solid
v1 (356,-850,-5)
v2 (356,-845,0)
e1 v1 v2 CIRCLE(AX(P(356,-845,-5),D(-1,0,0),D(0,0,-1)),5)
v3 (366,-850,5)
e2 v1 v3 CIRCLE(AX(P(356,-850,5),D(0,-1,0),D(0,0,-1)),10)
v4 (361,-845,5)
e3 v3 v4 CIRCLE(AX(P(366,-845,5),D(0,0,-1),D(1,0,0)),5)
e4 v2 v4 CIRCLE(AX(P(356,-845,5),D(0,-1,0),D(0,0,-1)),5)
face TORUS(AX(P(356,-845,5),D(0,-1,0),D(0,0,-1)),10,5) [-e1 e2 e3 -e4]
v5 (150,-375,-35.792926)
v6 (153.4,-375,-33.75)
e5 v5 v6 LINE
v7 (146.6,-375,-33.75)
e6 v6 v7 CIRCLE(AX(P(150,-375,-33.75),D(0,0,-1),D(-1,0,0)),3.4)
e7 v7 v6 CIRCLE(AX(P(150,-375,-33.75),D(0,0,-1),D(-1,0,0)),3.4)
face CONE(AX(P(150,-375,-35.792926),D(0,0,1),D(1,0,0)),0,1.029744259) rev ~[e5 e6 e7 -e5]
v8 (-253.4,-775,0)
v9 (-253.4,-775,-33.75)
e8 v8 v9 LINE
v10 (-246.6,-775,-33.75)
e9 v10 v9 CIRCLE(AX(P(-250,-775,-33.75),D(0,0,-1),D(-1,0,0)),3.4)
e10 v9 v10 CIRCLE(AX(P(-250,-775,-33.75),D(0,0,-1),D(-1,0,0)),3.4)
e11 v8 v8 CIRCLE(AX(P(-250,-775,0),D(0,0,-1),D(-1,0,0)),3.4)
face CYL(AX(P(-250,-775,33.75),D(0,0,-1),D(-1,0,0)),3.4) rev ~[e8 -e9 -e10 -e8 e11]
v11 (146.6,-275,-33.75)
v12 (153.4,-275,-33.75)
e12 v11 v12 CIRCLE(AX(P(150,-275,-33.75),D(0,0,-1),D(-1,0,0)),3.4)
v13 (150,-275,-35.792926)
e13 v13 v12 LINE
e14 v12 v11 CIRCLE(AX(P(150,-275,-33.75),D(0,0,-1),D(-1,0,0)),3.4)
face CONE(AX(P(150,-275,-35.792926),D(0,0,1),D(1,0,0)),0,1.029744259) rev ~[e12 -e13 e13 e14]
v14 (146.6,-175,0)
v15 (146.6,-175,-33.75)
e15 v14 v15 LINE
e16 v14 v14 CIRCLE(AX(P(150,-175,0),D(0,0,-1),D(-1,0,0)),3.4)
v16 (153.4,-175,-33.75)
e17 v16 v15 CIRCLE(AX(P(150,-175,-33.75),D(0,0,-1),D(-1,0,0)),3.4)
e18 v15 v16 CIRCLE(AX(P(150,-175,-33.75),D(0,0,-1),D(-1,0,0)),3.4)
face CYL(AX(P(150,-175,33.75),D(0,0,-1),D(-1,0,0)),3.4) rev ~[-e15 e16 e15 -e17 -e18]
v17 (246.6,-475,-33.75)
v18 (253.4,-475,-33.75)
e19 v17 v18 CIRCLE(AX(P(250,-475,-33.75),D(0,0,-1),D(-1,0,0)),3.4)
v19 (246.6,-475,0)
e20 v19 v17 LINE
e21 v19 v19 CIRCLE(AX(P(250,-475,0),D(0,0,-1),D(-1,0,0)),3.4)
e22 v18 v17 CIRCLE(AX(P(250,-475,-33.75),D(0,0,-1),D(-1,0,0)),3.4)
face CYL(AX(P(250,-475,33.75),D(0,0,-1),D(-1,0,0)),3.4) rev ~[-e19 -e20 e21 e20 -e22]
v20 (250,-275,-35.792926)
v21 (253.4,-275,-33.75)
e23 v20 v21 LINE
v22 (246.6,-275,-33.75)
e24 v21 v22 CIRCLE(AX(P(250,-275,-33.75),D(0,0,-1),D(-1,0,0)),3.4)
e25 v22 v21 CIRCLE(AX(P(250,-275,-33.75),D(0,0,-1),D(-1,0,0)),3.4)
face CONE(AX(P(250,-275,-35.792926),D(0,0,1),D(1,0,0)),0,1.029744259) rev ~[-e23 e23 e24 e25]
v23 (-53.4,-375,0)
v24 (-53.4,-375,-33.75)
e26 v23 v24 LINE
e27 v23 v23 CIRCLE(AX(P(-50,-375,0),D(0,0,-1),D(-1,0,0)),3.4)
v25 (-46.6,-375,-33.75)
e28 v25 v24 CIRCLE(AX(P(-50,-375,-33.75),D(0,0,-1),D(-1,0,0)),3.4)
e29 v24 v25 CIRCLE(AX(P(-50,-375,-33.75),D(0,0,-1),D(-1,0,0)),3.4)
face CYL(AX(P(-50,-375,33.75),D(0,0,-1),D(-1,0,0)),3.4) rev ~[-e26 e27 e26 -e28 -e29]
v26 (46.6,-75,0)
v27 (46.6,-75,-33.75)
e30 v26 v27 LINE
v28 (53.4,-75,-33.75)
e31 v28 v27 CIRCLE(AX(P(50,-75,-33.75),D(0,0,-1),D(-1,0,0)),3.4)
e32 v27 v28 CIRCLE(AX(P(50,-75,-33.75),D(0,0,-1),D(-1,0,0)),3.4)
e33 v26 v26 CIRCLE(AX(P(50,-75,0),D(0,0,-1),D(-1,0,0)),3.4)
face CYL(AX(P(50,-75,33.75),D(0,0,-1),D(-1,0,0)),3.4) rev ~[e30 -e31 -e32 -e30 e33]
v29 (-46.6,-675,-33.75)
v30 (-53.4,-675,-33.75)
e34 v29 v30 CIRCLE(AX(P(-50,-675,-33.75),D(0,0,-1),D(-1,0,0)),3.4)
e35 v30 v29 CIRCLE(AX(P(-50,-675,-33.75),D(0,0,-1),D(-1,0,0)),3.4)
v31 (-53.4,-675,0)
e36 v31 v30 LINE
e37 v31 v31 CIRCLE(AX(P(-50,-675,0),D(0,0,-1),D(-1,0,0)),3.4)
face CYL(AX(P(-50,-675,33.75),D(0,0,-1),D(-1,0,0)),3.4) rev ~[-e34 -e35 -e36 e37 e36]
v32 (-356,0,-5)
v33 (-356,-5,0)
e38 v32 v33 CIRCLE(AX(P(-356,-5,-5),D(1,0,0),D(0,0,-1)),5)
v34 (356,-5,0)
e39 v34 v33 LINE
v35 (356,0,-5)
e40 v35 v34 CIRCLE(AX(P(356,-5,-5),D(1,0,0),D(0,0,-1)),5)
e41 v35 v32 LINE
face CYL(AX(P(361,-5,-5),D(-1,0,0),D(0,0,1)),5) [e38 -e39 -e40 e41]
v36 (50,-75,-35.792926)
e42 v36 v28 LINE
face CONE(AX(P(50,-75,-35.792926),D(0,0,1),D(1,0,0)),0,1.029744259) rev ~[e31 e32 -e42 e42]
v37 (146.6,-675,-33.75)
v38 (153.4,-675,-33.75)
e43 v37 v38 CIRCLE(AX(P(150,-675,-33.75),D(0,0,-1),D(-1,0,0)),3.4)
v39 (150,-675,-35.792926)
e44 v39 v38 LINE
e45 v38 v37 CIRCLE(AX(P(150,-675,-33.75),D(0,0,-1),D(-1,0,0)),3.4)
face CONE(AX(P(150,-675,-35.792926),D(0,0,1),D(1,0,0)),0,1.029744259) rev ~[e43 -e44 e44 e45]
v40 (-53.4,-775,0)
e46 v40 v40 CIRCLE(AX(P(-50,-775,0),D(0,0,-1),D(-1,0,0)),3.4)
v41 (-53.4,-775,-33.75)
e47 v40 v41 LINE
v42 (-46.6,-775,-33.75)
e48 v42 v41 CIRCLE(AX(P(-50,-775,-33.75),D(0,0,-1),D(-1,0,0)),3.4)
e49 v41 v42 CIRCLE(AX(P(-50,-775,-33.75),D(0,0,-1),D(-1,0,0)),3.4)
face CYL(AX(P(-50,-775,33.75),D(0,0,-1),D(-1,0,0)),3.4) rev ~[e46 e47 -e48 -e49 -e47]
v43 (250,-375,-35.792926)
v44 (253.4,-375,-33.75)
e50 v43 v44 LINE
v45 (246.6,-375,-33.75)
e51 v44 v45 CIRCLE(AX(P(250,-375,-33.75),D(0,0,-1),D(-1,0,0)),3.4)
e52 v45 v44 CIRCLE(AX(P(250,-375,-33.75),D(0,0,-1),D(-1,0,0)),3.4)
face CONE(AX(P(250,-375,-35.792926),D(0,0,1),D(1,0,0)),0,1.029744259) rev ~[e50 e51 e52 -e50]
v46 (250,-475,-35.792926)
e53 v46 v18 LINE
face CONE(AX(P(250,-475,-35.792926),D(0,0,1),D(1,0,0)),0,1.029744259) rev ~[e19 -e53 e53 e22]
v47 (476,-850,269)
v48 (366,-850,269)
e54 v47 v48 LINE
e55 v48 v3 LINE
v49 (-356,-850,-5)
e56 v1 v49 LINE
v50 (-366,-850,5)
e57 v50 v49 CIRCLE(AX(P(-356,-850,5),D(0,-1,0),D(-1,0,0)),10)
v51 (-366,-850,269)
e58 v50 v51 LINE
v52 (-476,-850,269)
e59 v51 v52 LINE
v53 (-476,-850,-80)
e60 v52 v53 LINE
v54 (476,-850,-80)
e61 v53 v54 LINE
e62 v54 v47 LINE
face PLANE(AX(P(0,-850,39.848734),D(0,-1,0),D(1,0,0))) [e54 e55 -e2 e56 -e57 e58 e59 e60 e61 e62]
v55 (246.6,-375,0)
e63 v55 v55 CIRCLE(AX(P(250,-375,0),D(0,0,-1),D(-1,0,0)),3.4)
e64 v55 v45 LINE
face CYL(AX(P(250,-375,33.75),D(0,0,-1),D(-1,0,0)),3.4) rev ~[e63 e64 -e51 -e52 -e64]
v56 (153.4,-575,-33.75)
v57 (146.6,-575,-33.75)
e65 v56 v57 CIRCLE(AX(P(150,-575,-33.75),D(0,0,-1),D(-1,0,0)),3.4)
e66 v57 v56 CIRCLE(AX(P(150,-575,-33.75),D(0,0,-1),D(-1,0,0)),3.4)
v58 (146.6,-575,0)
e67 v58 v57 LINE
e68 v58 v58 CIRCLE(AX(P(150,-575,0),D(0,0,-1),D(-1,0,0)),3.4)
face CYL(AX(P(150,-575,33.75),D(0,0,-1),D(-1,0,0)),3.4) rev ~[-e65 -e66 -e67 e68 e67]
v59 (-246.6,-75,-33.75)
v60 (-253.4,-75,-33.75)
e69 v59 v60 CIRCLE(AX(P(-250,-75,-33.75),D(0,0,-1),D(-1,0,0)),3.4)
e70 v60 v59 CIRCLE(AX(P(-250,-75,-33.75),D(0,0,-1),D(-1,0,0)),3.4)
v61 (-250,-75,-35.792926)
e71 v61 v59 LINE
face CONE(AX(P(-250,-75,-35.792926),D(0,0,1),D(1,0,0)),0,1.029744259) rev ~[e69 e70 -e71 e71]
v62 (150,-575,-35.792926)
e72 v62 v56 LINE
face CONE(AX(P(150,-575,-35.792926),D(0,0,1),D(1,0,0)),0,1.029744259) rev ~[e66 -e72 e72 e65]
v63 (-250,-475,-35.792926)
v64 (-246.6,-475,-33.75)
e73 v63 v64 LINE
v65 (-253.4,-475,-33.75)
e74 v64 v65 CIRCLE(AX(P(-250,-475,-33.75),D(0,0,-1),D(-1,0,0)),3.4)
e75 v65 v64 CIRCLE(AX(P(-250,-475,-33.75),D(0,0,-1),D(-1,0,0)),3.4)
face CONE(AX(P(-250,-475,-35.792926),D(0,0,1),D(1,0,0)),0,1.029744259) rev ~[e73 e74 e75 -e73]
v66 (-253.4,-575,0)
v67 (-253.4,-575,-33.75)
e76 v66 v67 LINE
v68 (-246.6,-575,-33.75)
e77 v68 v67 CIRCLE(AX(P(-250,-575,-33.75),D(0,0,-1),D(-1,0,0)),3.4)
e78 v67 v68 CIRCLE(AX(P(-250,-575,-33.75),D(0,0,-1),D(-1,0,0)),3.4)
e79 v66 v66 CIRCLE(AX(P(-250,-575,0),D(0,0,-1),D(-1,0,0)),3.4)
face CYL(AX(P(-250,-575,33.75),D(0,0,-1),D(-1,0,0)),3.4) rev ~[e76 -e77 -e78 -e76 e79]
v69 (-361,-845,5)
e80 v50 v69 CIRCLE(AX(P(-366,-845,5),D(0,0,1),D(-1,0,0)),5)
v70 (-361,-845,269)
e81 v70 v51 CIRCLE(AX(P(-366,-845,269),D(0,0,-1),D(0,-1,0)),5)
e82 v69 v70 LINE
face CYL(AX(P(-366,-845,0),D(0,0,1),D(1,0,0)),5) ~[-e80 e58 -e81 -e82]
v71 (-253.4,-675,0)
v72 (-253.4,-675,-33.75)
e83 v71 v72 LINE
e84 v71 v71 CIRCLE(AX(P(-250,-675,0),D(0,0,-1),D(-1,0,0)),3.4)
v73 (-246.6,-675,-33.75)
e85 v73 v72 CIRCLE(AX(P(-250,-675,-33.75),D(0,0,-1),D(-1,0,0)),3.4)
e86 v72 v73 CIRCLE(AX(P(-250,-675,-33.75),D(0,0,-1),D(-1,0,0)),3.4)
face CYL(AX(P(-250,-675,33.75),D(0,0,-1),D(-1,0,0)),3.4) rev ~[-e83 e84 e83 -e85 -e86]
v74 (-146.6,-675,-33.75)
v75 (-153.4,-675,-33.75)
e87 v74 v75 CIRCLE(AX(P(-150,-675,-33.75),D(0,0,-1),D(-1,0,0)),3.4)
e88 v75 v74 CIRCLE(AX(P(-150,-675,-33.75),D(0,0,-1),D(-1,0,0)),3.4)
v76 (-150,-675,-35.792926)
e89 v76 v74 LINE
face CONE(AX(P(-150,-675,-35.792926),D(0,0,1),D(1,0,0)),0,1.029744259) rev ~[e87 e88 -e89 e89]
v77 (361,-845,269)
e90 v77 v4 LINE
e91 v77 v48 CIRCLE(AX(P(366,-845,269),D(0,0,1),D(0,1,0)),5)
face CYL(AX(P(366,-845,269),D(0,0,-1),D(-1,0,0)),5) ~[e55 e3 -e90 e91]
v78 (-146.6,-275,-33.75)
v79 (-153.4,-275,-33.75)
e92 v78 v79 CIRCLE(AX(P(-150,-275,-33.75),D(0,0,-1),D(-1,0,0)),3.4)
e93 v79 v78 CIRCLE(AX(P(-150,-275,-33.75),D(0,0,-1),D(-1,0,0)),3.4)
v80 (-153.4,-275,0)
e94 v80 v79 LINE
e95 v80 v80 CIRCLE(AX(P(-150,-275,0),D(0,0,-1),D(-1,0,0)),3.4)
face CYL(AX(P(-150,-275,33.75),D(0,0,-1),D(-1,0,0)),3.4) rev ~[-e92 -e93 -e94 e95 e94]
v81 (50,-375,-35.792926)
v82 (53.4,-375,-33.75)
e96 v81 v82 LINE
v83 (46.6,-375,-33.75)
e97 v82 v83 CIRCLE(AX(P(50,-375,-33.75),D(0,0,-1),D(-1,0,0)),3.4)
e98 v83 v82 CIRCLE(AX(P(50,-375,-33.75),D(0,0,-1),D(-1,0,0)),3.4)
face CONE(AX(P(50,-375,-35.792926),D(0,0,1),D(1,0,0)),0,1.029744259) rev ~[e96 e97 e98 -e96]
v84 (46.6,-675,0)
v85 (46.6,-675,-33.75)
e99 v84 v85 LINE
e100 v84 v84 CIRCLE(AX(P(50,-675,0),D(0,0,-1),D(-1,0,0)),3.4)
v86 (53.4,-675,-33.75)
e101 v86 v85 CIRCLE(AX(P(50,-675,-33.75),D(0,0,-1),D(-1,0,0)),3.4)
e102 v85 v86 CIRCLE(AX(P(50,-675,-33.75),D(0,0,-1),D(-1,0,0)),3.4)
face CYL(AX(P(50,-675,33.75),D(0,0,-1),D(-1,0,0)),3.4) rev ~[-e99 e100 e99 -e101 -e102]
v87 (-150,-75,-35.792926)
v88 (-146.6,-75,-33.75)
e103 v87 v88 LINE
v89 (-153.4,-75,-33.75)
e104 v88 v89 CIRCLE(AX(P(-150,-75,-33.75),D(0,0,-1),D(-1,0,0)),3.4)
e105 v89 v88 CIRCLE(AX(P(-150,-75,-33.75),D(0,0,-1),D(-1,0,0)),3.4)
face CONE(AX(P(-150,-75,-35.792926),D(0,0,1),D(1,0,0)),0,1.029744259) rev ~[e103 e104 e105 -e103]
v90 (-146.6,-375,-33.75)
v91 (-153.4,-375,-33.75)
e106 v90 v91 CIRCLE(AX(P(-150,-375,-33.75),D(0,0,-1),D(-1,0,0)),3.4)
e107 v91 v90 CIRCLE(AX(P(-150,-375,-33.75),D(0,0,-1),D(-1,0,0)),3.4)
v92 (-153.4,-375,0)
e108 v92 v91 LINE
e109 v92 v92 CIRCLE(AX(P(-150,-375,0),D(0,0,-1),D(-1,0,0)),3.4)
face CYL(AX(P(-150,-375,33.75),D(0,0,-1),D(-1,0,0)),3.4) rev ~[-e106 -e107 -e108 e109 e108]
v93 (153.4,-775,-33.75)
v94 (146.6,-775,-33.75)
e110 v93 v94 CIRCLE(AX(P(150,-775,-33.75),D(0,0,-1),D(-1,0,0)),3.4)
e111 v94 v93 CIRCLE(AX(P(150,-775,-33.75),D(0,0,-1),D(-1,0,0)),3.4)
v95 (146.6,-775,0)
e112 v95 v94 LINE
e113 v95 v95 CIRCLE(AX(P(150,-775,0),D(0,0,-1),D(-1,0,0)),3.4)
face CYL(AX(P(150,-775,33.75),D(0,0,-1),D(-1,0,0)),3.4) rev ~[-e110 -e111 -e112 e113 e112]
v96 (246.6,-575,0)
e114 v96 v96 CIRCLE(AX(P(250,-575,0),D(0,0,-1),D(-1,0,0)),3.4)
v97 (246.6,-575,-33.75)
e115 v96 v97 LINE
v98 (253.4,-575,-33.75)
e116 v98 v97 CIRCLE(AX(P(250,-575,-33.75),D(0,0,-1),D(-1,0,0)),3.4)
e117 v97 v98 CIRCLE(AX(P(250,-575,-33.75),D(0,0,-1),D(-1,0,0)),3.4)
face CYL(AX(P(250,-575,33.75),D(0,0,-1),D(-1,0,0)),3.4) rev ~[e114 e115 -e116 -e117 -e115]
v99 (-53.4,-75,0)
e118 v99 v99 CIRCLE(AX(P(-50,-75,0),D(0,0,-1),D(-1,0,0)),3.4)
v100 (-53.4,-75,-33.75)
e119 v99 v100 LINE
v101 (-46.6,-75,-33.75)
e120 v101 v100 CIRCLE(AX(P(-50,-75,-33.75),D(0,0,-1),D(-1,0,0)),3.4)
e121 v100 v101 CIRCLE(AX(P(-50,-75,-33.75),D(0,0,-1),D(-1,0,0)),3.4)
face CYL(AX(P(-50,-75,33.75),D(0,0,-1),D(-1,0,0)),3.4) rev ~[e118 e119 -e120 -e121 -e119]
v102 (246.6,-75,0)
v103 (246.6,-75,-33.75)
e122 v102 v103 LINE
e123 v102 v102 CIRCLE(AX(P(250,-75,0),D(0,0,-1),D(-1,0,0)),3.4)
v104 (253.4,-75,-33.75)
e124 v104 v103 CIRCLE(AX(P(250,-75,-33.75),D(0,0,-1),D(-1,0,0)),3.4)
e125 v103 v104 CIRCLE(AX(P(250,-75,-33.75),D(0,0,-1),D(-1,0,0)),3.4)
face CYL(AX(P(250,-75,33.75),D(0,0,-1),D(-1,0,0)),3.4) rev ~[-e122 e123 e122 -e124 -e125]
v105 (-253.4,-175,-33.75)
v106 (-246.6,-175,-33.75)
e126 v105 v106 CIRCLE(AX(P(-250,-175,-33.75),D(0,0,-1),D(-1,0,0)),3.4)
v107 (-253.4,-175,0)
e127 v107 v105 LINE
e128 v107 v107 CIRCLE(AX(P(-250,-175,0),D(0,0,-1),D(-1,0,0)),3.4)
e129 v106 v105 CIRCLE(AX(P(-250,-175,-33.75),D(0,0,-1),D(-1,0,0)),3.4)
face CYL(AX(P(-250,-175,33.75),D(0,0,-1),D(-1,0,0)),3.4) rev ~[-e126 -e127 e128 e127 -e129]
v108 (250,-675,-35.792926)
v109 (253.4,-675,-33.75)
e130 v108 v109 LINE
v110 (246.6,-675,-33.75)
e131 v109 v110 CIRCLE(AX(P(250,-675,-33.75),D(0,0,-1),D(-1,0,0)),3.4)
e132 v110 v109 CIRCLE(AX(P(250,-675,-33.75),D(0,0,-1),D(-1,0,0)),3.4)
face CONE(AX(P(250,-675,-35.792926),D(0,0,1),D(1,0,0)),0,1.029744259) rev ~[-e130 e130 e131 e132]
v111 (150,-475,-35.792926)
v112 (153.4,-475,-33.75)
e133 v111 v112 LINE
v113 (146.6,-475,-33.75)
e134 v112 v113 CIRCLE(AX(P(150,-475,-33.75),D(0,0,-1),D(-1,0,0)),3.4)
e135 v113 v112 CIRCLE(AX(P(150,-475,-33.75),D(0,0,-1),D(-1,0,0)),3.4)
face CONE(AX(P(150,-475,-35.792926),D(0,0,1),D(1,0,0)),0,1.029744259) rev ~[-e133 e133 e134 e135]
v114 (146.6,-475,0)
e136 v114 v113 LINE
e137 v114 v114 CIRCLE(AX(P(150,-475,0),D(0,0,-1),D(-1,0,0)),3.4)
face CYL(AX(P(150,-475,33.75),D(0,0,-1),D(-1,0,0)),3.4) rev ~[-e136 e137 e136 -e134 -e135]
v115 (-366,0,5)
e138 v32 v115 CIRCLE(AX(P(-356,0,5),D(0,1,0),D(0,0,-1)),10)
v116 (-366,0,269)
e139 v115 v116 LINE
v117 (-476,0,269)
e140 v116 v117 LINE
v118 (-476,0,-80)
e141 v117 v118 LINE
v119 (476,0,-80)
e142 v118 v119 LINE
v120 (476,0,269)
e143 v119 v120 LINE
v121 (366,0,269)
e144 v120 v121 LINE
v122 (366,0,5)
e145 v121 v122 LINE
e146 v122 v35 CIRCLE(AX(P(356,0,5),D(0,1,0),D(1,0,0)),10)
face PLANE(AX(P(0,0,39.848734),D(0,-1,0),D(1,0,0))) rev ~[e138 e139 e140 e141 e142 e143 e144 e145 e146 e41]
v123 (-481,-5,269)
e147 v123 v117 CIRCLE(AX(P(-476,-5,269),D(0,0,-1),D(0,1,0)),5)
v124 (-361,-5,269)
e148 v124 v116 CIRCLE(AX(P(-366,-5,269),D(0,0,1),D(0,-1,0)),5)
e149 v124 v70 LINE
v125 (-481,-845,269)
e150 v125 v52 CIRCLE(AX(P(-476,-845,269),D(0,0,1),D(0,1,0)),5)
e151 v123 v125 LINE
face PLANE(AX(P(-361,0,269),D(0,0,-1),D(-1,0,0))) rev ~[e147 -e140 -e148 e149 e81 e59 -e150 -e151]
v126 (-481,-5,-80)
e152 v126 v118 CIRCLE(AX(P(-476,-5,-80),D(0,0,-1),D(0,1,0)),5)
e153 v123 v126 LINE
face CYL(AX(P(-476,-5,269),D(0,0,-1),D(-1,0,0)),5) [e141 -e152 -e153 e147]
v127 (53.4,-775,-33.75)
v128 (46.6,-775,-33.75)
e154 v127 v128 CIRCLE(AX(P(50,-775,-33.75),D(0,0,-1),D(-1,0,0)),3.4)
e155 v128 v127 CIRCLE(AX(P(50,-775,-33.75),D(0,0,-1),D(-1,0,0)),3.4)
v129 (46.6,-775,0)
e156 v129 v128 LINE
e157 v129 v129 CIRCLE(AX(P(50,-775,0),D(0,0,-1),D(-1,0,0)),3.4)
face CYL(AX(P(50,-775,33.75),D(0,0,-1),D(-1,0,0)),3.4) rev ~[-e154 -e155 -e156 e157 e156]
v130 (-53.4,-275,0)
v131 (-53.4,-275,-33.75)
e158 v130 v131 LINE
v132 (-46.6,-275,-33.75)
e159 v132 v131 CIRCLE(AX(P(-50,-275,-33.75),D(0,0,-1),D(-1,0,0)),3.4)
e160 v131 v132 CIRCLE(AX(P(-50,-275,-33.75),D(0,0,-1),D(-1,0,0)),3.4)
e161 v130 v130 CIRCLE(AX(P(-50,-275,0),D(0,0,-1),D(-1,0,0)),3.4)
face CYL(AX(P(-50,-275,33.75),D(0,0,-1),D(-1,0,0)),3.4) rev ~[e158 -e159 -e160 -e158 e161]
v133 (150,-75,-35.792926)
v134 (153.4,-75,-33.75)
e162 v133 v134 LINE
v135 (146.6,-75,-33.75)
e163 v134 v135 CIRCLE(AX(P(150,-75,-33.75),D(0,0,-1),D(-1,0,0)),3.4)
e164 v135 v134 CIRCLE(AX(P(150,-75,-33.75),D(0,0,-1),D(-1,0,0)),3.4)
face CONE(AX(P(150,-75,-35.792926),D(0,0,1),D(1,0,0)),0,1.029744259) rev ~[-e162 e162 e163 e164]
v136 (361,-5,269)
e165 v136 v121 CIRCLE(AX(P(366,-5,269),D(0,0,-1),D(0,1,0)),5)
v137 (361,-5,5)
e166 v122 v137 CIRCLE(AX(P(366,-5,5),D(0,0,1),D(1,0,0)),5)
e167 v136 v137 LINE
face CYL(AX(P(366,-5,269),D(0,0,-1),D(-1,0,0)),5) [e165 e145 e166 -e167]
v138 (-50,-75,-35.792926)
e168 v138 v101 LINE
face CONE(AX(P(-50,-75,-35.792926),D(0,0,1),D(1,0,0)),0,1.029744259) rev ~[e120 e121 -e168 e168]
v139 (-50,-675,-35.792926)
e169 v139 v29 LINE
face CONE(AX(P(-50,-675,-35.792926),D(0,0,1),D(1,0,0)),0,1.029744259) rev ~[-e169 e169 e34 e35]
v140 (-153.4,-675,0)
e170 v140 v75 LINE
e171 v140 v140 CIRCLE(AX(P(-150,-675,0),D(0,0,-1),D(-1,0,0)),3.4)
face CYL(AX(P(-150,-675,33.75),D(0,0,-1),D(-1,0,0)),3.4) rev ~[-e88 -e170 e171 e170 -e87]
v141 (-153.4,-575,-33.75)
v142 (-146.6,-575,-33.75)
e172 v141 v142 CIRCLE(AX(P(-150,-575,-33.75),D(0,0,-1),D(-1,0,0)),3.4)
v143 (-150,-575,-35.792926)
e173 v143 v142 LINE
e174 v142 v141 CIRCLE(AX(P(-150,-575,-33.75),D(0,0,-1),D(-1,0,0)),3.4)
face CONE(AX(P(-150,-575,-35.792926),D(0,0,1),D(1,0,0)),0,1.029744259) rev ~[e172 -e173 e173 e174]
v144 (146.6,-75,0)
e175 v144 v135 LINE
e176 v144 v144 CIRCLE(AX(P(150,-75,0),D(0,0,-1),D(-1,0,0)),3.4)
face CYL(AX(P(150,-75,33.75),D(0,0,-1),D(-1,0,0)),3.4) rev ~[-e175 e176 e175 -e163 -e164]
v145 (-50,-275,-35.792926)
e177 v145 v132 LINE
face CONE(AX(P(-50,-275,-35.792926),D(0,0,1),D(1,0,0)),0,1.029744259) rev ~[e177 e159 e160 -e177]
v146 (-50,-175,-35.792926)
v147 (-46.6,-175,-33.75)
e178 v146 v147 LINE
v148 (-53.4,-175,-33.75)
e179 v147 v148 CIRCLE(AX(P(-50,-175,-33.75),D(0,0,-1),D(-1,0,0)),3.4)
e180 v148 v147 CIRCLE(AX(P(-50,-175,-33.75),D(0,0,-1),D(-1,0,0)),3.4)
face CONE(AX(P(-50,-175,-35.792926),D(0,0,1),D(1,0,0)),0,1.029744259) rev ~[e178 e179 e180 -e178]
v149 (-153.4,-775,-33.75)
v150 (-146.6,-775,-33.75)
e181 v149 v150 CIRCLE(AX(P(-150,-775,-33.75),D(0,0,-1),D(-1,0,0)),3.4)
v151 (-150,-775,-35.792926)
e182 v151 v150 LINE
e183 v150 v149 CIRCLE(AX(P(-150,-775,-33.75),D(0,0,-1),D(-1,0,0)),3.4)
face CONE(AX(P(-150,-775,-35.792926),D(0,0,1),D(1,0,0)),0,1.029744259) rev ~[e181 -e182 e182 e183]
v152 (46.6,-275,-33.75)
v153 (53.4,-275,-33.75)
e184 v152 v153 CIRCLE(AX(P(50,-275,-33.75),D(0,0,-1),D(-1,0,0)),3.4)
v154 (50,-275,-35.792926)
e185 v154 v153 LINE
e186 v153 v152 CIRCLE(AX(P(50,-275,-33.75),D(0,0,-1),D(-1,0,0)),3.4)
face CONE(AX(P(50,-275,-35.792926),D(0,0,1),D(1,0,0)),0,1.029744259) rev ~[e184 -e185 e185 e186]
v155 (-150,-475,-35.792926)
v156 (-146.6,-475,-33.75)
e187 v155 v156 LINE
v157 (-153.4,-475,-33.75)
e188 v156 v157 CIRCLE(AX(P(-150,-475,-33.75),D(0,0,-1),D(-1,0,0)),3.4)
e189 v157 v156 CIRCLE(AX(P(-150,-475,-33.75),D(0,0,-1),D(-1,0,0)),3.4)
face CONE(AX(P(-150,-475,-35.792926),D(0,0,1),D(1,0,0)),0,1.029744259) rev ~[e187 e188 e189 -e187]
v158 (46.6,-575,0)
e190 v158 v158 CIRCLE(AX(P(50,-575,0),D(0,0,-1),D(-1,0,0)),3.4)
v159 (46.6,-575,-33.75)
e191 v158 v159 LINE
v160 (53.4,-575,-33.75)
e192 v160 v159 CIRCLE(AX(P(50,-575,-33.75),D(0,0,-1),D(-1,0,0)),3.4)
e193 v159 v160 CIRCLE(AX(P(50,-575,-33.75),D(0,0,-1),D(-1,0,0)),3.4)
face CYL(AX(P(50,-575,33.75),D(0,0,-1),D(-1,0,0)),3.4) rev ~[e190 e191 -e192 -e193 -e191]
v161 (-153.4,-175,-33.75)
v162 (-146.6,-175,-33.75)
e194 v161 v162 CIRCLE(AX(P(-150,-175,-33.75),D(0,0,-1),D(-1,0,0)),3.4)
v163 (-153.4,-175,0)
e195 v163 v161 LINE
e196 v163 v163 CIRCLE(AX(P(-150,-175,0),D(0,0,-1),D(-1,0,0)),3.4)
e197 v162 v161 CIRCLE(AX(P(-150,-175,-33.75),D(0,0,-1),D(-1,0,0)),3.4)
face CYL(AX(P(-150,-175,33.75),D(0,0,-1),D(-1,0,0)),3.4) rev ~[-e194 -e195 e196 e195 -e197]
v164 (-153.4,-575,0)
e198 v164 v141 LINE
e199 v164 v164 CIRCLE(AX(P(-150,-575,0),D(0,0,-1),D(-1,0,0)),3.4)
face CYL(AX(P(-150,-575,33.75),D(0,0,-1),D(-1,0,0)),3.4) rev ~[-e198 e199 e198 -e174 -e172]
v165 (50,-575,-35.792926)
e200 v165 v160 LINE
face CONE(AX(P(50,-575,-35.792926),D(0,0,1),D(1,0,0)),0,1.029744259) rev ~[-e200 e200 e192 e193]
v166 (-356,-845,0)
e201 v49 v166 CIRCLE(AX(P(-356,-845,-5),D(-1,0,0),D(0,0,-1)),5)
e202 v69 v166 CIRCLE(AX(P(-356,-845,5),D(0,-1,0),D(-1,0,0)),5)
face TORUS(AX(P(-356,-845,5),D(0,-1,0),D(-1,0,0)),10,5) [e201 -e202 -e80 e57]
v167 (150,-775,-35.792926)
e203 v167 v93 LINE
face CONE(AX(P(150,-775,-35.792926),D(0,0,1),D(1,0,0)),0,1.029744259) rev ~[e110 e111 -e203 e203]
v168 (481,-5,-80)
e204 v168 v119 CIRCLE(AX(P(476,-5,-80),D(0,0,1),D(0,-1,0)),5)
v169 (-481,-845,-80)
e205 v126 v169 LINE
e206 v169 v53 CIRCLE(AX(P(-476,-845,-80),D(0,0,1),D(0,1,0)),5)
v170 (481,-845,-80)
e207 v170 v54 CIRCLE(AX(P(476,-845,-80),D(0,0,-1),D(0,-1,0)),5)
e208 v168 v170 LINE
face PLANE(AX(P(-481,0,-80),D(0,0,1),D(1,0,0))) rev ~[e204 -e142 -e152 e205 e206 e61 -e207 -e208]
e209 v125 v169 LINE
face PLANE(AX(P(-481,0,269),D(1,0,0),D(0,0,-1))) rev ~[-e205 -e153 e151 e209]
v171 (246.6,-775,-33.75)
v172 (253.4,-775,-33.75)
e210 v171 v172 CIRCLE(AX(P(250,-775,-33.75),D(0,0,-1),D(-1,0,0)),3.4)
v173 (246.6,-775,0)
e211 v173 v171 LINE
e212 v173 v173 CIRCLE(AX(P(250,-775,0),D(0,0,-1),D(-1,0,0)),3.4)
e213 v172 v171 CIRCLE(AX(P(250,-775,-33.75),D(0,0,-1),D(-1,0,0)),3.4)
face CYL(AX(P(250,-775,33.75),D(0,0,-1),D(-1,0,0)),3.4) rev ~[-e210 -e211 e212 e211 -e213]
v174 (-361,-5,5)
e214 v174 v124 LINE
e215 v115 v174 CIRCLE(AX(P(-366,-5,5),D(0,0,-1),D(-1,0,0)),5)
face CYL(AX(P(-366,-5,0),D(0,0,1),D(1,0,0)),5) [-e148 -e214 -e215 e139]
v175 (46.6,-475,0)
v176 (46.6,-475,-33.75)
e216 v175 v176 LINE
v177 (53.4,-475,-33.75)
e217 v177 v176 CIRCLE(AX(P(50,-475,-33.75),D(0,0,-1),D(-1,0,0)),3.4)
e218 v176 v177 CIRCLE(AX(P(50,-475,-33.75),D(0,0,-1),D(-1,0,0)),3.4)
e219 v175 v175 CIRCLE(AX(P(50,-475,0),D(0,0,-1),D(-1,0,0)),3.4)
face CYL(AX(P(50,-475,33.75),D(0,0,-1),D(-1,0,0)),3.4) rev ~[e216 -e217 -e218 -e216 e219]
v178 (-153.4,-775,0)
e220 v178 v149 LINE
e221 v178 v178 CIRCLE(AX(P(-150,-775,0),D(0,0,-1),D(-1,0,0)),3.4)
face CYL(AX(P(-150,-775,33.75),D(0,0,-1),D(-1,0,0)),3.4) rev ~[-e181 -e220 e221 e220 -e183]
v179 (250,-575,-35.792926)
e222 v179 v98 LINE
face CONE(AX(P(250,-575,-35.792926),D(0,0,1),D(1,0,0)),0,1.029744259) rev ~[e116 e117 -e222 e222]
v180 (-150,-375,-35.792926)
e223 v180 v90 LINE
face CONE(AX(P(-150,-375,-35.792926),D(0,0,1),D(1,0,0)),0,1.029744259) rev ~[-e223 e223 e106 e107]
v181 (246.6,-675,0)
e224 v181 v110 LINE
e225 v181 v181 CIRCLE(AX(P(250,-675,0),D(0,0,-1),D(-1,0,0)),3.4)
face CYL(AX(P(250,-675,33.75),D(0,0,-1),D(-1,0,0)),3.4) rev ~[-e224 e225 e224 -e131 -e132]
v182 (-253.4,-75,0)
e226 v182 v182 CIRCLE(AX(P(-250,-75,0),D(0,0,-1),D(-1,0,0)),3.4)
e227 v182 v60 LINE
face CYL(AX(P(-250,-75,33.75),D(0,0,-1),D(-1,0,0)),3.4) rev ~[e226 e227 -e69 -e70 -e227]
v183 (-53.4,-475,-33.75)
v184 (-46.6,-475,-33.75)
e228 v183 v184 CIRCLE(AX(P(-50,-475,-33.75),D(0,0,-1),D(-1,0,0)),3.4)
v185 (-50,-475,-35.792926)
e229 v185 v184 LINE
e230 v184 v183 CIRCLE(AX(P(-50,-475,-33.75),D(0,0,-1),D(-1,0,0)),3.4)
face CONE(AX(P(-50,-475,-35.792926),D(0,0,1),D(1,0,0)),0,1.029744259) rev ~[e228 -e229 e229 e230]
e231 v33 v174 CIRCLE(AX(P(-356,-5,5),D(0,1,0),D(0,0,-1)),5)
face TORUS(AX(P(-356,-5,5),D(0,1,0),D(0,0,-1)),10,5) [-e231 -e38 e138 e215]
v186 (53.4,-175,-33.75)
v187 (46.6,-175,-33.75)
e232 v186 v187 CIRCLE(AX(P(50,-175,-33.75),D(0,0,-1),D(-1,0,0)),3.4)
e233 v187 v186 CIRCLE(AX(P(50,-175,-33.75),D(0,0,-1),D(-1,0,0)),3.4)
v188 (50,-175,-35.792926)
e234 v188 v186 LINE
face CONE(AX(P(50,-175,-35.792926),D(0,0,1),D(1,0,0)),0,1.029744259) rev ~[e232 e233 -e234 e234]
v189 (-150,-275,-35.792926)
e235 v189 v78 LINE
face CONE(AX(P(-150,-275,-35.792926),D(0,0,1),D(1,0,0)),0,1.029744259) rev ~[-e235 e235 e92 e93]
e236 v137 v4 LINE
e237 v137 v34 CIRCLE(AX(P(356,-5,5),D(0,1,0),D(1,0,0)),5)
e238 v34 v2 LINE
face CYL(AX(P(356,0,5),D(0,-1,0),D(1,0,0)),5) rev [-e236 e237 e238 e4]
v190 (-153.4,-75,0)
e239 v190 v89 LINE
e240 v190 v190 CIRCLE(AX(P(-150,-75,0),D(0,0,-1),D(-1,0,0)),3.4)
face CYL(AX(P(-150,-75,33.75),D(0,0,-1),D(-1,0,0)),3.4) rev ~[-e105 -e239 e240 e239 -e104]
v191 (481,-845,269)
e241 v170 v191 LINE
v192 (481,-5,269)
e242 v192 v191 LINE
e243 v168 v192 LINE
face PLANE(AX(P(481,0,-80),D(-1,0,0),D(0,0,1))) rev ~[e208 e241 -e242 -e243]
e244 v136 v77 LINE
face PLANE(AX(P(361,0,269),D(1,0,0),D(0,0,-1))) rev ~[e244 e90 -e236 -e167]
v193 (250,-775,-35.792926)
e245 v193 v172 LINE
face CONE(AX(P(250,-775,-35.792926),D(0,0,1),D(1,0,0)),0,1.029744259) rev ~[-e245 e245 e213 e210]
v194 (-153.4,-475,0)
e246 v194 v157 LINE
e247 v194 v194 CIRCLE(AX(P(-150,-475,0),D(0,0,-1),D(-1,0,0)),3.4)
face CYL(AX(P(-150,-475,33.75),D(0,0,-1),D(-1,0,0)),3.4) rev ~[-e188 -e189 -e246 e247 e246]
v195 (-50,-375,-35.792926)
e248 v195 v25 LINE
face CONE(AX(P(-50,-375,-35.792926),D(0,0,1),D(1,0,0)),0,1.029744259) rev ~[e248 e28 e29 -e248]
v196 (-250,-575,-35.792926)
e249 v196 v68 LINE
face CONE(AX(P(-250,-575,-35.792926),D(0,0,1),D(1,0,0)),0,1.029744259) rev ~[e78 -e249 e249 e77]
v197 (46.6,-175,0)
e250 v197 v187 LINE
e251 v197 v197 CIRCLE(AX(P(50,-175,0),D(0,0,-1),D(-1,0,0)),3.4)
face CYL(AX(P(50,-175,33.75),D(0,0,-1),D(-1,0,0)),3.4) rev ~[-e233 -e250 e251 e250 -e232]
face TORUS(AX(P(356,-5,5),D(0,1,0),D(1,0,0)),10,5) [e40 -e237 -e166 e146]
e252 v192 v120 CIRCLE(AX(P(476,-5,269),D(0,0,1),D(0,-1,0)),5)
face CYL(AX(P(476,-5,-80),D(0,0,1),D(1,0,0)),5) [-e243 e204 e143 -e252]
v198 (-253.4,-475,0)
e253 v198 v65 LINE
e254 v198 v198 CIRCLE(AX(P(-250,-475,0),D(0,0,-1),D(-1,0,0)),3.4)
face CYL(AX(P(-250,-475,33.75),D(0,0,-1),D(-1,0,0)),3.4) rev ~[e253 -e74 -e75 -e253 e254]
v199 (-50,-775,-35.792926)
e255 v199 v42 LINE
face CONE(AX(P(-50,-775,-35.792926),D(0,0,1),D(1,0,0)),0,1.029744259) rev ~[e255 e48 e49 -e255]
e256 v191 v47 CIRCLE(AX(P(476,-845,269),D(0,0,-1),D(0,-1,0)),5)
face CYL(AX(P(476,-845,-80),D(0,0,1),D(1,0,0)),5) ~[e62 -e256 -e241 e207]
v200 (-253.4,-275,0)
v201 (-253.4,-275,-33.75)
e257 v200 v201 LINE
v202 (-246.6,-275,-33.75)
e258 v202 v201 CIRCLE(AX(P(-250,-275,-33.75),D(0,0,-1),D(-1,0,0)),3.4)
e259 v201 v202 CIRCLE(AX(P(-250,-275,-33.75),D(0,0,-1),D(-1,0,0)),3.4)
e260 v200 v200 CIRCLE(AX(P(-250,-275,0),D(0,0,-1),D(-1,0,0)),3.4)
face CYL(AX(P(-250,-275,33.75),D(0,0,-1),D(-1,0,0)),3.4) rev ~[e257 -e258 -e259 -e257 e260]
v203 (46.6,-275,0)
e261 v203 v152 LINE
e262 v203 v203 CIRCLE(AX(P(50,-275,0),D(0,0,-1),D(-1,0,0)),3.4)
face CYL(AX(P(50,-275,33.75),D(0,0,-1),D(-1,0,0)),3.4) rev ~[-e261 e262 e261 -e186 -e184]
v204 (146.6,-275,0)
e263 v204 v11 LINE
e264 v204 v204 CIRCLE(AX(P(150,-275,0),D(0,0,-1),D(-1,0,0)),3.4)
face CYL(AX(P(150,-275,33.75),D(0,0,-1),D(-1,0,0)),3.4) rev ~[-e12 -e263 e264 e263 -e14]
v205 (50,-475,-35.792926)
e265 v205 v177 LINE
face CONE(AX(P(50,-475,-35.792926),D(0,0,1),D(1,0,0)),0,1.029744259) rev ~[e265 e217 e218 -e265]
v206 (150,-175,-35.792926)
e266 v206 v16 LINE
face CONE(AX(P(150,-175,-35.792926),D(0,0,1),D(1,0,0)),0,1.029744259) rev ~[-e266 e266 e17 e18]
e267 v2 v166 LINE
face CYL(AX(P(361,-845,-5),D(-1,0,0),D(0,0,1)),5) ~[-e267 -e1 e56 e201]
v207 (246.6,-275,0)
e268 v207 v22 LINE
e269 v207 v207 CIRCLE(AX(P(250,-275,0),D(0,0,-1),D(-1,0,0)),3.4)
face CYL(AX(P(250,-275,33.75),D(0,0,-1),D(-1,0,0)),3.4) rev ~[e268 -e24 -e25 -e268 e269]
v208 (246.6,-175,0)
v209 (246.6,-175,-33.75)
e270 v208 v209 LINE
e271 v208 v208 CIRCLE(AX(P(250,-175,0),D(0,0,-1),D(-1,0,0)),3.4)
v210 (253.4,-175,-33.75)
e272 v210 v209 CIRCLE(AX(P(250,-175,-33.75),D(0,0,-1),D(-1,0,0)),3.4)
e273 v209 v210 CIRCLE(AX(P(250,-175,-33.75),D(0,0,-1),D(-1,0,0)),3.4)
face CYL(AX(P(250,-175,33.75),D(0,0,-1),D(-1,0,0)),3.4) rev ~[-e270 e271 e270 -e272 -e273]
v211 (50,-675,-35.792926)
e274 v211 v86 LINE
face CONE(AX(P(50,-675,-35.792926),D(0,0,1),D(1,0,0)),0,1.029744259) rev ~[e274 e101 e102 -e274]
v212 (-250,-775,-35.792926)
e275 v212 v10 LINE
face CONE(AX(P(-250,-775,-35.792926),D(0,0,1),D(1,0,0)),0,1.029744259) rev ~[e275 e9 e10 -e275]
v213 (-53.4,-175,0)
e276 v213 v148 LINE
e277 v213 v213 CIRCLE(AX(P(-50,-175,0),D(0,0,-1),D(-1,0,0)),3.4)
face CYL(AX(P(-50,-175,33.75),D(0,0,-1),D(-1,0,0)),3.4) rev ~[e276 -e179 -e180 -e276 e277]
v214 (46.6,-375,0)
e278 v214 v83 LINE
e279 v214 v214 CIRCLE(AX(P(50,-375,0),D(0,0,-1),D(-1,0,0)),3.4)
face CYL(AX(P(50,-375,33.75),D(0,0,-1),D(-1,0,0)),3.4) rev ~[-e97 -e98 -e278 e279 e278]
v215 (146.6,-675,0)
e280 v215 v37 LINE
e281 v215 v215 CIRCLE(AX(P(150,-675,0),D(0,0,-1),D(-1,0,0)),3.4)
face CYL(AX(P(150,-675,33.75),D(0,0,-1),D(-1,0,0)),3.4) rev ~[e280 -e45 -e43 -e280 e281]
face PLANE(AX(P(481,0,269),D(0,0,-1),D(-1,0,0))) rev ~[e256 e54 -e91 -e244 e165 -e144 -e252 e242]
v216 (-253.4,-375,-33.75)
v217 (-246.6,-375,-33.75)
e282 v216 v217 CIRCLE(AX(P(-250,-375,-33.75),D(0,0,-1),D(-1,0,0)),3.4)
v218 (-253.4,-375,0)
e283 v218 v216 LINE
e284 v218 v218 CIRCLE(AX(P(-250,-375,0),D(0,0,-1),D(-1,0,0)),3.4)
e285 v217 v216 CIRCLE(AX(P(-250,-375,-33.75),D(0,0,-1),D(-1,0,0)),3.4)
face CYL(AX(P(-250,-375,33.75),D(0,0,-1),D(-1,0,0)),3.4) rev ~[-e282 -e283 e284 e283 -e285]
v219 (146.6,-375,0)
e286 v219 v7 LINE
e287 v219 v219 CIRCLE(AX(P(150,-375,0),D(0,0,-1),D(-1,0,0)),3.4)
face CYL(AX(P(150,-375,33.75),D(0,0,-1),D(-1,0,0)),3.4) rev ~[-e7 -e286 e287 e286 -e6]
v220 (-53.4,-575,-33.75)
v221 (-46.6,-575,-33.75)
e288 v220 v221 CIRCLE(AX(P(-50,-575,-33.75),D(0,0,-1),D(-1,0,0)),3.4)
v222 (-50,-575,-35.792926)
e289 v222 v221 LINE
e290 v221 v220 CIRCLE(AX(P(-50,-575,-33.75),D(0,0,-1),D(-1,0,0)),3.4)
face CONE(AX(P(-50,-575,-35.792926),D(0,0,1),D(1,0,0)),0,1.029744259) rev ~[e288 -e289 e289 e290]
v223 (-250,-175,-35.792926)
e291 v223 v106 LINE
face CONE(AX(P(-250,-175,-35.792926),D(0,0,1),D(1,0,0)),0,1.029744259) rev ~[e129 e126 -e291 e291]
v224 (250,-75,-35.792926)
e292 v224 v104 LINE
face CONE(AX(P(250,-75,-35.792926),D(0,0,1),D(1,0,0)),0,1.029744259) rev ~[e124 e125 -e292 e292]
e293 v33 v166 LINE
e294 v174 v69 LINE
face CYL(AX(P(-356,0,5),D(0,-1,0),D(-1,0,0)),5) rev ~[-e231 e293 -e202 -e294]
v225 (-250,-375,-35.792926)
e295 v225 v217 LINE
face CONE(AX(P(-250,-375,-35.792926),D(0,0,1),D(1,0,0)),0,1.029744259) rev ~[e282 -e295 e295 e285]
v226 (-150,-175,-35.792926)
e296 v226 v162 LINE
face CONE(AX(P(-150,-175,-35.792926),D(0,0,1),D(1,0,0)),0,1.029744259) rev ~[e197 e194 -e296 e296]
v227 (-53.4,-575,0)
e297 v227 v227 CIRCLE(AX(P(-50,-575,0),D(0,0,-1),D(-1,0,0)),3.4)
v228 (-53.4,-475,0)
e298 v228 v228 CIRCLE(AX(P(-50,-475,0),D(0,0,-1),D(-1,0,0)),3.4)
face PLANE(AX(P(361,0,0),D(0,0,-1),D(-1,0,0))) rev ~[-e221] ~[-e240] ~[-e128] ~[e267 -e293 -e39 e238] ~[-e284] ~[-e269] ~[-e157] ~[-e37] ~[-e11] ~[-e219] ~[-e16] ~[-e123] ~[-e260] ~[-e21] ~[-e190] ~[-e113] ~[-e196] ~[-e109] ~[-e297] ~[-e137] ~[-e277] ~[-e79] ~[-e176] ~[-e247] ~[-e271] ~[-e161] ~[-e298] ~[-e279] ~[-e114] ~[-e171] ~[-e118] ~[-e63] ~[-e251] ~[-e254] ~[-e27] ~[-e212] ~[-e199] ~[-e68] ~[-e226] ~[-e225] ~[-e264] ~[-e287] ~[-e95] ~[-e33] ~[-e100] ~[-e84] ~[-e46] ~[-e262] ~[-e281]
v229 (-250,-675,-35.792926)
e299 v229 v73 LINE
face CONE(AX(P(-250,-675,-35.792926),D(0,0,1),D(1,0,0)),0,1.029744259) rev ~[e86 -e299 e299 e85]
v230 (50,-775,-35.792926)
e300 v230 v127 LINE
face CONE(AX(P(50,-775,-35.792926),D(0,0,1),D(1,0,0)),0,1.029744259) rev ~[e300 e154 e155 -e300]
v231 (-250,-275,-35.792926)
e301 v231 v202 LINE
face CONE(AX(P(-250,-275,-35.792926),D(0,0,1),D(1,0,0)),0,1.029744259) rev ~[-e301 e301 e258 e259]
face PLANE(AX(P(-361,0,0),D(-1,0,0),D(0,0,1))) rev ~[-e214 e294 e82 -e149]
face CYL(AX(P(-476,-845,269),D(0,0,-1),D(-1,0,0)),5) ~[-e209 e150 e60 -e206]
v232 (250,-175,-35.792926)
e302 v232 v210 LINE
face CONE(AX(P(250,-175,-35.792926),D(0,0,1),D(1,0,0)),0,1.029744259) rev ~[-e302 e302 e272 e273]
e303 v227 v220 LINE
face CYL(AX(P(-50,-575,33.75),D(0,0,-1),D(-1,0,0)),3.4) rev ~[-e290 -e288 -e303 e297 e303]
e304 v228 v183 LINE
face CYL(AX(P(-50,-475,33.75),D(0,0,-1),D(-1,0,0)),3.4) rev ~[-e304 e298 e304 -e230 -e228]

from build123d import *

# Parameters (mm, degrees)
F1_DEPTH = 850
F2_R     = 5
F4_D     = 6.8
F4_DEPTH = 33.75
F4_TIP   = 2.0429261047


with BuildPart() as f1:
    # F0 (on Front) → F1 (new body)
    with BuildSketch(Plane.XZ):
        Polygon((0, 0), (-361, 0), (-361, 269), (-481, 269), (-481, -80), (0, -80), (481, -80), (481, 269), (361, 269), (361, 0), align=None)
    extrude(amount=F1_DEPTH)

    # F2
    f2_edges = [f1.edges().sort_by_distance(p)[0] for p in [
        (-361, -425, 0),
        (361, -425, 0),
        (-361, -850, 134.5),
        (-481, -850, 94.5),
        (481, -850, 94.5),
        (481, 0, 94.5),
        (361, 0, 134.5),
        (-481, 0, 94.5),
        (0, 0, 0),
        (0, -850, 0),
        (361, -850, 134.5),
        (-361, 0, 134.5),
    ]]
    fillet(f2_edges, radius=F2_R)

    # F4
    with Locations(Plane.XY):
        with Locations((50, -675), (50, -775), (-150, -75), (150, -775), (250, -75), (250, -175), (-50, -675), (-150, -675), (-250, -375), (-150, -775), (50, -575), (250, -275), (50, -75), (-150, -475), (-50, -475), (-50, -375), (-250, -275), (150, -75), (-150, -275), (250, -475), (-50, -775), (-250, -75), (250, -375), (-150, -175), (250, -575), (50, -475), (-250, -175), (-250, -575), (-50, -575), (250, -675), (50, -375), (-50, -75), (-50, -275), (-150, -375), (250, -775), (50, -275), (-250, -475), (-250, -775), (150, -175), (50, -175), (-150, -575), (150, -275), (-50, -175), (-250, -675), (150, -375), (150, -475), (150, -675), (150, -575)):
            Hole(F4_D / 2, depth=F4_DEPTH)
            with Locations((0, 0, -(F4_DEPTH + F4_TIP / 2))):  # 118° drill point
                Cone(0, F4_D / 2, F4_TIP, mode=Mode.SUBTRACT)


solid = f1.part
